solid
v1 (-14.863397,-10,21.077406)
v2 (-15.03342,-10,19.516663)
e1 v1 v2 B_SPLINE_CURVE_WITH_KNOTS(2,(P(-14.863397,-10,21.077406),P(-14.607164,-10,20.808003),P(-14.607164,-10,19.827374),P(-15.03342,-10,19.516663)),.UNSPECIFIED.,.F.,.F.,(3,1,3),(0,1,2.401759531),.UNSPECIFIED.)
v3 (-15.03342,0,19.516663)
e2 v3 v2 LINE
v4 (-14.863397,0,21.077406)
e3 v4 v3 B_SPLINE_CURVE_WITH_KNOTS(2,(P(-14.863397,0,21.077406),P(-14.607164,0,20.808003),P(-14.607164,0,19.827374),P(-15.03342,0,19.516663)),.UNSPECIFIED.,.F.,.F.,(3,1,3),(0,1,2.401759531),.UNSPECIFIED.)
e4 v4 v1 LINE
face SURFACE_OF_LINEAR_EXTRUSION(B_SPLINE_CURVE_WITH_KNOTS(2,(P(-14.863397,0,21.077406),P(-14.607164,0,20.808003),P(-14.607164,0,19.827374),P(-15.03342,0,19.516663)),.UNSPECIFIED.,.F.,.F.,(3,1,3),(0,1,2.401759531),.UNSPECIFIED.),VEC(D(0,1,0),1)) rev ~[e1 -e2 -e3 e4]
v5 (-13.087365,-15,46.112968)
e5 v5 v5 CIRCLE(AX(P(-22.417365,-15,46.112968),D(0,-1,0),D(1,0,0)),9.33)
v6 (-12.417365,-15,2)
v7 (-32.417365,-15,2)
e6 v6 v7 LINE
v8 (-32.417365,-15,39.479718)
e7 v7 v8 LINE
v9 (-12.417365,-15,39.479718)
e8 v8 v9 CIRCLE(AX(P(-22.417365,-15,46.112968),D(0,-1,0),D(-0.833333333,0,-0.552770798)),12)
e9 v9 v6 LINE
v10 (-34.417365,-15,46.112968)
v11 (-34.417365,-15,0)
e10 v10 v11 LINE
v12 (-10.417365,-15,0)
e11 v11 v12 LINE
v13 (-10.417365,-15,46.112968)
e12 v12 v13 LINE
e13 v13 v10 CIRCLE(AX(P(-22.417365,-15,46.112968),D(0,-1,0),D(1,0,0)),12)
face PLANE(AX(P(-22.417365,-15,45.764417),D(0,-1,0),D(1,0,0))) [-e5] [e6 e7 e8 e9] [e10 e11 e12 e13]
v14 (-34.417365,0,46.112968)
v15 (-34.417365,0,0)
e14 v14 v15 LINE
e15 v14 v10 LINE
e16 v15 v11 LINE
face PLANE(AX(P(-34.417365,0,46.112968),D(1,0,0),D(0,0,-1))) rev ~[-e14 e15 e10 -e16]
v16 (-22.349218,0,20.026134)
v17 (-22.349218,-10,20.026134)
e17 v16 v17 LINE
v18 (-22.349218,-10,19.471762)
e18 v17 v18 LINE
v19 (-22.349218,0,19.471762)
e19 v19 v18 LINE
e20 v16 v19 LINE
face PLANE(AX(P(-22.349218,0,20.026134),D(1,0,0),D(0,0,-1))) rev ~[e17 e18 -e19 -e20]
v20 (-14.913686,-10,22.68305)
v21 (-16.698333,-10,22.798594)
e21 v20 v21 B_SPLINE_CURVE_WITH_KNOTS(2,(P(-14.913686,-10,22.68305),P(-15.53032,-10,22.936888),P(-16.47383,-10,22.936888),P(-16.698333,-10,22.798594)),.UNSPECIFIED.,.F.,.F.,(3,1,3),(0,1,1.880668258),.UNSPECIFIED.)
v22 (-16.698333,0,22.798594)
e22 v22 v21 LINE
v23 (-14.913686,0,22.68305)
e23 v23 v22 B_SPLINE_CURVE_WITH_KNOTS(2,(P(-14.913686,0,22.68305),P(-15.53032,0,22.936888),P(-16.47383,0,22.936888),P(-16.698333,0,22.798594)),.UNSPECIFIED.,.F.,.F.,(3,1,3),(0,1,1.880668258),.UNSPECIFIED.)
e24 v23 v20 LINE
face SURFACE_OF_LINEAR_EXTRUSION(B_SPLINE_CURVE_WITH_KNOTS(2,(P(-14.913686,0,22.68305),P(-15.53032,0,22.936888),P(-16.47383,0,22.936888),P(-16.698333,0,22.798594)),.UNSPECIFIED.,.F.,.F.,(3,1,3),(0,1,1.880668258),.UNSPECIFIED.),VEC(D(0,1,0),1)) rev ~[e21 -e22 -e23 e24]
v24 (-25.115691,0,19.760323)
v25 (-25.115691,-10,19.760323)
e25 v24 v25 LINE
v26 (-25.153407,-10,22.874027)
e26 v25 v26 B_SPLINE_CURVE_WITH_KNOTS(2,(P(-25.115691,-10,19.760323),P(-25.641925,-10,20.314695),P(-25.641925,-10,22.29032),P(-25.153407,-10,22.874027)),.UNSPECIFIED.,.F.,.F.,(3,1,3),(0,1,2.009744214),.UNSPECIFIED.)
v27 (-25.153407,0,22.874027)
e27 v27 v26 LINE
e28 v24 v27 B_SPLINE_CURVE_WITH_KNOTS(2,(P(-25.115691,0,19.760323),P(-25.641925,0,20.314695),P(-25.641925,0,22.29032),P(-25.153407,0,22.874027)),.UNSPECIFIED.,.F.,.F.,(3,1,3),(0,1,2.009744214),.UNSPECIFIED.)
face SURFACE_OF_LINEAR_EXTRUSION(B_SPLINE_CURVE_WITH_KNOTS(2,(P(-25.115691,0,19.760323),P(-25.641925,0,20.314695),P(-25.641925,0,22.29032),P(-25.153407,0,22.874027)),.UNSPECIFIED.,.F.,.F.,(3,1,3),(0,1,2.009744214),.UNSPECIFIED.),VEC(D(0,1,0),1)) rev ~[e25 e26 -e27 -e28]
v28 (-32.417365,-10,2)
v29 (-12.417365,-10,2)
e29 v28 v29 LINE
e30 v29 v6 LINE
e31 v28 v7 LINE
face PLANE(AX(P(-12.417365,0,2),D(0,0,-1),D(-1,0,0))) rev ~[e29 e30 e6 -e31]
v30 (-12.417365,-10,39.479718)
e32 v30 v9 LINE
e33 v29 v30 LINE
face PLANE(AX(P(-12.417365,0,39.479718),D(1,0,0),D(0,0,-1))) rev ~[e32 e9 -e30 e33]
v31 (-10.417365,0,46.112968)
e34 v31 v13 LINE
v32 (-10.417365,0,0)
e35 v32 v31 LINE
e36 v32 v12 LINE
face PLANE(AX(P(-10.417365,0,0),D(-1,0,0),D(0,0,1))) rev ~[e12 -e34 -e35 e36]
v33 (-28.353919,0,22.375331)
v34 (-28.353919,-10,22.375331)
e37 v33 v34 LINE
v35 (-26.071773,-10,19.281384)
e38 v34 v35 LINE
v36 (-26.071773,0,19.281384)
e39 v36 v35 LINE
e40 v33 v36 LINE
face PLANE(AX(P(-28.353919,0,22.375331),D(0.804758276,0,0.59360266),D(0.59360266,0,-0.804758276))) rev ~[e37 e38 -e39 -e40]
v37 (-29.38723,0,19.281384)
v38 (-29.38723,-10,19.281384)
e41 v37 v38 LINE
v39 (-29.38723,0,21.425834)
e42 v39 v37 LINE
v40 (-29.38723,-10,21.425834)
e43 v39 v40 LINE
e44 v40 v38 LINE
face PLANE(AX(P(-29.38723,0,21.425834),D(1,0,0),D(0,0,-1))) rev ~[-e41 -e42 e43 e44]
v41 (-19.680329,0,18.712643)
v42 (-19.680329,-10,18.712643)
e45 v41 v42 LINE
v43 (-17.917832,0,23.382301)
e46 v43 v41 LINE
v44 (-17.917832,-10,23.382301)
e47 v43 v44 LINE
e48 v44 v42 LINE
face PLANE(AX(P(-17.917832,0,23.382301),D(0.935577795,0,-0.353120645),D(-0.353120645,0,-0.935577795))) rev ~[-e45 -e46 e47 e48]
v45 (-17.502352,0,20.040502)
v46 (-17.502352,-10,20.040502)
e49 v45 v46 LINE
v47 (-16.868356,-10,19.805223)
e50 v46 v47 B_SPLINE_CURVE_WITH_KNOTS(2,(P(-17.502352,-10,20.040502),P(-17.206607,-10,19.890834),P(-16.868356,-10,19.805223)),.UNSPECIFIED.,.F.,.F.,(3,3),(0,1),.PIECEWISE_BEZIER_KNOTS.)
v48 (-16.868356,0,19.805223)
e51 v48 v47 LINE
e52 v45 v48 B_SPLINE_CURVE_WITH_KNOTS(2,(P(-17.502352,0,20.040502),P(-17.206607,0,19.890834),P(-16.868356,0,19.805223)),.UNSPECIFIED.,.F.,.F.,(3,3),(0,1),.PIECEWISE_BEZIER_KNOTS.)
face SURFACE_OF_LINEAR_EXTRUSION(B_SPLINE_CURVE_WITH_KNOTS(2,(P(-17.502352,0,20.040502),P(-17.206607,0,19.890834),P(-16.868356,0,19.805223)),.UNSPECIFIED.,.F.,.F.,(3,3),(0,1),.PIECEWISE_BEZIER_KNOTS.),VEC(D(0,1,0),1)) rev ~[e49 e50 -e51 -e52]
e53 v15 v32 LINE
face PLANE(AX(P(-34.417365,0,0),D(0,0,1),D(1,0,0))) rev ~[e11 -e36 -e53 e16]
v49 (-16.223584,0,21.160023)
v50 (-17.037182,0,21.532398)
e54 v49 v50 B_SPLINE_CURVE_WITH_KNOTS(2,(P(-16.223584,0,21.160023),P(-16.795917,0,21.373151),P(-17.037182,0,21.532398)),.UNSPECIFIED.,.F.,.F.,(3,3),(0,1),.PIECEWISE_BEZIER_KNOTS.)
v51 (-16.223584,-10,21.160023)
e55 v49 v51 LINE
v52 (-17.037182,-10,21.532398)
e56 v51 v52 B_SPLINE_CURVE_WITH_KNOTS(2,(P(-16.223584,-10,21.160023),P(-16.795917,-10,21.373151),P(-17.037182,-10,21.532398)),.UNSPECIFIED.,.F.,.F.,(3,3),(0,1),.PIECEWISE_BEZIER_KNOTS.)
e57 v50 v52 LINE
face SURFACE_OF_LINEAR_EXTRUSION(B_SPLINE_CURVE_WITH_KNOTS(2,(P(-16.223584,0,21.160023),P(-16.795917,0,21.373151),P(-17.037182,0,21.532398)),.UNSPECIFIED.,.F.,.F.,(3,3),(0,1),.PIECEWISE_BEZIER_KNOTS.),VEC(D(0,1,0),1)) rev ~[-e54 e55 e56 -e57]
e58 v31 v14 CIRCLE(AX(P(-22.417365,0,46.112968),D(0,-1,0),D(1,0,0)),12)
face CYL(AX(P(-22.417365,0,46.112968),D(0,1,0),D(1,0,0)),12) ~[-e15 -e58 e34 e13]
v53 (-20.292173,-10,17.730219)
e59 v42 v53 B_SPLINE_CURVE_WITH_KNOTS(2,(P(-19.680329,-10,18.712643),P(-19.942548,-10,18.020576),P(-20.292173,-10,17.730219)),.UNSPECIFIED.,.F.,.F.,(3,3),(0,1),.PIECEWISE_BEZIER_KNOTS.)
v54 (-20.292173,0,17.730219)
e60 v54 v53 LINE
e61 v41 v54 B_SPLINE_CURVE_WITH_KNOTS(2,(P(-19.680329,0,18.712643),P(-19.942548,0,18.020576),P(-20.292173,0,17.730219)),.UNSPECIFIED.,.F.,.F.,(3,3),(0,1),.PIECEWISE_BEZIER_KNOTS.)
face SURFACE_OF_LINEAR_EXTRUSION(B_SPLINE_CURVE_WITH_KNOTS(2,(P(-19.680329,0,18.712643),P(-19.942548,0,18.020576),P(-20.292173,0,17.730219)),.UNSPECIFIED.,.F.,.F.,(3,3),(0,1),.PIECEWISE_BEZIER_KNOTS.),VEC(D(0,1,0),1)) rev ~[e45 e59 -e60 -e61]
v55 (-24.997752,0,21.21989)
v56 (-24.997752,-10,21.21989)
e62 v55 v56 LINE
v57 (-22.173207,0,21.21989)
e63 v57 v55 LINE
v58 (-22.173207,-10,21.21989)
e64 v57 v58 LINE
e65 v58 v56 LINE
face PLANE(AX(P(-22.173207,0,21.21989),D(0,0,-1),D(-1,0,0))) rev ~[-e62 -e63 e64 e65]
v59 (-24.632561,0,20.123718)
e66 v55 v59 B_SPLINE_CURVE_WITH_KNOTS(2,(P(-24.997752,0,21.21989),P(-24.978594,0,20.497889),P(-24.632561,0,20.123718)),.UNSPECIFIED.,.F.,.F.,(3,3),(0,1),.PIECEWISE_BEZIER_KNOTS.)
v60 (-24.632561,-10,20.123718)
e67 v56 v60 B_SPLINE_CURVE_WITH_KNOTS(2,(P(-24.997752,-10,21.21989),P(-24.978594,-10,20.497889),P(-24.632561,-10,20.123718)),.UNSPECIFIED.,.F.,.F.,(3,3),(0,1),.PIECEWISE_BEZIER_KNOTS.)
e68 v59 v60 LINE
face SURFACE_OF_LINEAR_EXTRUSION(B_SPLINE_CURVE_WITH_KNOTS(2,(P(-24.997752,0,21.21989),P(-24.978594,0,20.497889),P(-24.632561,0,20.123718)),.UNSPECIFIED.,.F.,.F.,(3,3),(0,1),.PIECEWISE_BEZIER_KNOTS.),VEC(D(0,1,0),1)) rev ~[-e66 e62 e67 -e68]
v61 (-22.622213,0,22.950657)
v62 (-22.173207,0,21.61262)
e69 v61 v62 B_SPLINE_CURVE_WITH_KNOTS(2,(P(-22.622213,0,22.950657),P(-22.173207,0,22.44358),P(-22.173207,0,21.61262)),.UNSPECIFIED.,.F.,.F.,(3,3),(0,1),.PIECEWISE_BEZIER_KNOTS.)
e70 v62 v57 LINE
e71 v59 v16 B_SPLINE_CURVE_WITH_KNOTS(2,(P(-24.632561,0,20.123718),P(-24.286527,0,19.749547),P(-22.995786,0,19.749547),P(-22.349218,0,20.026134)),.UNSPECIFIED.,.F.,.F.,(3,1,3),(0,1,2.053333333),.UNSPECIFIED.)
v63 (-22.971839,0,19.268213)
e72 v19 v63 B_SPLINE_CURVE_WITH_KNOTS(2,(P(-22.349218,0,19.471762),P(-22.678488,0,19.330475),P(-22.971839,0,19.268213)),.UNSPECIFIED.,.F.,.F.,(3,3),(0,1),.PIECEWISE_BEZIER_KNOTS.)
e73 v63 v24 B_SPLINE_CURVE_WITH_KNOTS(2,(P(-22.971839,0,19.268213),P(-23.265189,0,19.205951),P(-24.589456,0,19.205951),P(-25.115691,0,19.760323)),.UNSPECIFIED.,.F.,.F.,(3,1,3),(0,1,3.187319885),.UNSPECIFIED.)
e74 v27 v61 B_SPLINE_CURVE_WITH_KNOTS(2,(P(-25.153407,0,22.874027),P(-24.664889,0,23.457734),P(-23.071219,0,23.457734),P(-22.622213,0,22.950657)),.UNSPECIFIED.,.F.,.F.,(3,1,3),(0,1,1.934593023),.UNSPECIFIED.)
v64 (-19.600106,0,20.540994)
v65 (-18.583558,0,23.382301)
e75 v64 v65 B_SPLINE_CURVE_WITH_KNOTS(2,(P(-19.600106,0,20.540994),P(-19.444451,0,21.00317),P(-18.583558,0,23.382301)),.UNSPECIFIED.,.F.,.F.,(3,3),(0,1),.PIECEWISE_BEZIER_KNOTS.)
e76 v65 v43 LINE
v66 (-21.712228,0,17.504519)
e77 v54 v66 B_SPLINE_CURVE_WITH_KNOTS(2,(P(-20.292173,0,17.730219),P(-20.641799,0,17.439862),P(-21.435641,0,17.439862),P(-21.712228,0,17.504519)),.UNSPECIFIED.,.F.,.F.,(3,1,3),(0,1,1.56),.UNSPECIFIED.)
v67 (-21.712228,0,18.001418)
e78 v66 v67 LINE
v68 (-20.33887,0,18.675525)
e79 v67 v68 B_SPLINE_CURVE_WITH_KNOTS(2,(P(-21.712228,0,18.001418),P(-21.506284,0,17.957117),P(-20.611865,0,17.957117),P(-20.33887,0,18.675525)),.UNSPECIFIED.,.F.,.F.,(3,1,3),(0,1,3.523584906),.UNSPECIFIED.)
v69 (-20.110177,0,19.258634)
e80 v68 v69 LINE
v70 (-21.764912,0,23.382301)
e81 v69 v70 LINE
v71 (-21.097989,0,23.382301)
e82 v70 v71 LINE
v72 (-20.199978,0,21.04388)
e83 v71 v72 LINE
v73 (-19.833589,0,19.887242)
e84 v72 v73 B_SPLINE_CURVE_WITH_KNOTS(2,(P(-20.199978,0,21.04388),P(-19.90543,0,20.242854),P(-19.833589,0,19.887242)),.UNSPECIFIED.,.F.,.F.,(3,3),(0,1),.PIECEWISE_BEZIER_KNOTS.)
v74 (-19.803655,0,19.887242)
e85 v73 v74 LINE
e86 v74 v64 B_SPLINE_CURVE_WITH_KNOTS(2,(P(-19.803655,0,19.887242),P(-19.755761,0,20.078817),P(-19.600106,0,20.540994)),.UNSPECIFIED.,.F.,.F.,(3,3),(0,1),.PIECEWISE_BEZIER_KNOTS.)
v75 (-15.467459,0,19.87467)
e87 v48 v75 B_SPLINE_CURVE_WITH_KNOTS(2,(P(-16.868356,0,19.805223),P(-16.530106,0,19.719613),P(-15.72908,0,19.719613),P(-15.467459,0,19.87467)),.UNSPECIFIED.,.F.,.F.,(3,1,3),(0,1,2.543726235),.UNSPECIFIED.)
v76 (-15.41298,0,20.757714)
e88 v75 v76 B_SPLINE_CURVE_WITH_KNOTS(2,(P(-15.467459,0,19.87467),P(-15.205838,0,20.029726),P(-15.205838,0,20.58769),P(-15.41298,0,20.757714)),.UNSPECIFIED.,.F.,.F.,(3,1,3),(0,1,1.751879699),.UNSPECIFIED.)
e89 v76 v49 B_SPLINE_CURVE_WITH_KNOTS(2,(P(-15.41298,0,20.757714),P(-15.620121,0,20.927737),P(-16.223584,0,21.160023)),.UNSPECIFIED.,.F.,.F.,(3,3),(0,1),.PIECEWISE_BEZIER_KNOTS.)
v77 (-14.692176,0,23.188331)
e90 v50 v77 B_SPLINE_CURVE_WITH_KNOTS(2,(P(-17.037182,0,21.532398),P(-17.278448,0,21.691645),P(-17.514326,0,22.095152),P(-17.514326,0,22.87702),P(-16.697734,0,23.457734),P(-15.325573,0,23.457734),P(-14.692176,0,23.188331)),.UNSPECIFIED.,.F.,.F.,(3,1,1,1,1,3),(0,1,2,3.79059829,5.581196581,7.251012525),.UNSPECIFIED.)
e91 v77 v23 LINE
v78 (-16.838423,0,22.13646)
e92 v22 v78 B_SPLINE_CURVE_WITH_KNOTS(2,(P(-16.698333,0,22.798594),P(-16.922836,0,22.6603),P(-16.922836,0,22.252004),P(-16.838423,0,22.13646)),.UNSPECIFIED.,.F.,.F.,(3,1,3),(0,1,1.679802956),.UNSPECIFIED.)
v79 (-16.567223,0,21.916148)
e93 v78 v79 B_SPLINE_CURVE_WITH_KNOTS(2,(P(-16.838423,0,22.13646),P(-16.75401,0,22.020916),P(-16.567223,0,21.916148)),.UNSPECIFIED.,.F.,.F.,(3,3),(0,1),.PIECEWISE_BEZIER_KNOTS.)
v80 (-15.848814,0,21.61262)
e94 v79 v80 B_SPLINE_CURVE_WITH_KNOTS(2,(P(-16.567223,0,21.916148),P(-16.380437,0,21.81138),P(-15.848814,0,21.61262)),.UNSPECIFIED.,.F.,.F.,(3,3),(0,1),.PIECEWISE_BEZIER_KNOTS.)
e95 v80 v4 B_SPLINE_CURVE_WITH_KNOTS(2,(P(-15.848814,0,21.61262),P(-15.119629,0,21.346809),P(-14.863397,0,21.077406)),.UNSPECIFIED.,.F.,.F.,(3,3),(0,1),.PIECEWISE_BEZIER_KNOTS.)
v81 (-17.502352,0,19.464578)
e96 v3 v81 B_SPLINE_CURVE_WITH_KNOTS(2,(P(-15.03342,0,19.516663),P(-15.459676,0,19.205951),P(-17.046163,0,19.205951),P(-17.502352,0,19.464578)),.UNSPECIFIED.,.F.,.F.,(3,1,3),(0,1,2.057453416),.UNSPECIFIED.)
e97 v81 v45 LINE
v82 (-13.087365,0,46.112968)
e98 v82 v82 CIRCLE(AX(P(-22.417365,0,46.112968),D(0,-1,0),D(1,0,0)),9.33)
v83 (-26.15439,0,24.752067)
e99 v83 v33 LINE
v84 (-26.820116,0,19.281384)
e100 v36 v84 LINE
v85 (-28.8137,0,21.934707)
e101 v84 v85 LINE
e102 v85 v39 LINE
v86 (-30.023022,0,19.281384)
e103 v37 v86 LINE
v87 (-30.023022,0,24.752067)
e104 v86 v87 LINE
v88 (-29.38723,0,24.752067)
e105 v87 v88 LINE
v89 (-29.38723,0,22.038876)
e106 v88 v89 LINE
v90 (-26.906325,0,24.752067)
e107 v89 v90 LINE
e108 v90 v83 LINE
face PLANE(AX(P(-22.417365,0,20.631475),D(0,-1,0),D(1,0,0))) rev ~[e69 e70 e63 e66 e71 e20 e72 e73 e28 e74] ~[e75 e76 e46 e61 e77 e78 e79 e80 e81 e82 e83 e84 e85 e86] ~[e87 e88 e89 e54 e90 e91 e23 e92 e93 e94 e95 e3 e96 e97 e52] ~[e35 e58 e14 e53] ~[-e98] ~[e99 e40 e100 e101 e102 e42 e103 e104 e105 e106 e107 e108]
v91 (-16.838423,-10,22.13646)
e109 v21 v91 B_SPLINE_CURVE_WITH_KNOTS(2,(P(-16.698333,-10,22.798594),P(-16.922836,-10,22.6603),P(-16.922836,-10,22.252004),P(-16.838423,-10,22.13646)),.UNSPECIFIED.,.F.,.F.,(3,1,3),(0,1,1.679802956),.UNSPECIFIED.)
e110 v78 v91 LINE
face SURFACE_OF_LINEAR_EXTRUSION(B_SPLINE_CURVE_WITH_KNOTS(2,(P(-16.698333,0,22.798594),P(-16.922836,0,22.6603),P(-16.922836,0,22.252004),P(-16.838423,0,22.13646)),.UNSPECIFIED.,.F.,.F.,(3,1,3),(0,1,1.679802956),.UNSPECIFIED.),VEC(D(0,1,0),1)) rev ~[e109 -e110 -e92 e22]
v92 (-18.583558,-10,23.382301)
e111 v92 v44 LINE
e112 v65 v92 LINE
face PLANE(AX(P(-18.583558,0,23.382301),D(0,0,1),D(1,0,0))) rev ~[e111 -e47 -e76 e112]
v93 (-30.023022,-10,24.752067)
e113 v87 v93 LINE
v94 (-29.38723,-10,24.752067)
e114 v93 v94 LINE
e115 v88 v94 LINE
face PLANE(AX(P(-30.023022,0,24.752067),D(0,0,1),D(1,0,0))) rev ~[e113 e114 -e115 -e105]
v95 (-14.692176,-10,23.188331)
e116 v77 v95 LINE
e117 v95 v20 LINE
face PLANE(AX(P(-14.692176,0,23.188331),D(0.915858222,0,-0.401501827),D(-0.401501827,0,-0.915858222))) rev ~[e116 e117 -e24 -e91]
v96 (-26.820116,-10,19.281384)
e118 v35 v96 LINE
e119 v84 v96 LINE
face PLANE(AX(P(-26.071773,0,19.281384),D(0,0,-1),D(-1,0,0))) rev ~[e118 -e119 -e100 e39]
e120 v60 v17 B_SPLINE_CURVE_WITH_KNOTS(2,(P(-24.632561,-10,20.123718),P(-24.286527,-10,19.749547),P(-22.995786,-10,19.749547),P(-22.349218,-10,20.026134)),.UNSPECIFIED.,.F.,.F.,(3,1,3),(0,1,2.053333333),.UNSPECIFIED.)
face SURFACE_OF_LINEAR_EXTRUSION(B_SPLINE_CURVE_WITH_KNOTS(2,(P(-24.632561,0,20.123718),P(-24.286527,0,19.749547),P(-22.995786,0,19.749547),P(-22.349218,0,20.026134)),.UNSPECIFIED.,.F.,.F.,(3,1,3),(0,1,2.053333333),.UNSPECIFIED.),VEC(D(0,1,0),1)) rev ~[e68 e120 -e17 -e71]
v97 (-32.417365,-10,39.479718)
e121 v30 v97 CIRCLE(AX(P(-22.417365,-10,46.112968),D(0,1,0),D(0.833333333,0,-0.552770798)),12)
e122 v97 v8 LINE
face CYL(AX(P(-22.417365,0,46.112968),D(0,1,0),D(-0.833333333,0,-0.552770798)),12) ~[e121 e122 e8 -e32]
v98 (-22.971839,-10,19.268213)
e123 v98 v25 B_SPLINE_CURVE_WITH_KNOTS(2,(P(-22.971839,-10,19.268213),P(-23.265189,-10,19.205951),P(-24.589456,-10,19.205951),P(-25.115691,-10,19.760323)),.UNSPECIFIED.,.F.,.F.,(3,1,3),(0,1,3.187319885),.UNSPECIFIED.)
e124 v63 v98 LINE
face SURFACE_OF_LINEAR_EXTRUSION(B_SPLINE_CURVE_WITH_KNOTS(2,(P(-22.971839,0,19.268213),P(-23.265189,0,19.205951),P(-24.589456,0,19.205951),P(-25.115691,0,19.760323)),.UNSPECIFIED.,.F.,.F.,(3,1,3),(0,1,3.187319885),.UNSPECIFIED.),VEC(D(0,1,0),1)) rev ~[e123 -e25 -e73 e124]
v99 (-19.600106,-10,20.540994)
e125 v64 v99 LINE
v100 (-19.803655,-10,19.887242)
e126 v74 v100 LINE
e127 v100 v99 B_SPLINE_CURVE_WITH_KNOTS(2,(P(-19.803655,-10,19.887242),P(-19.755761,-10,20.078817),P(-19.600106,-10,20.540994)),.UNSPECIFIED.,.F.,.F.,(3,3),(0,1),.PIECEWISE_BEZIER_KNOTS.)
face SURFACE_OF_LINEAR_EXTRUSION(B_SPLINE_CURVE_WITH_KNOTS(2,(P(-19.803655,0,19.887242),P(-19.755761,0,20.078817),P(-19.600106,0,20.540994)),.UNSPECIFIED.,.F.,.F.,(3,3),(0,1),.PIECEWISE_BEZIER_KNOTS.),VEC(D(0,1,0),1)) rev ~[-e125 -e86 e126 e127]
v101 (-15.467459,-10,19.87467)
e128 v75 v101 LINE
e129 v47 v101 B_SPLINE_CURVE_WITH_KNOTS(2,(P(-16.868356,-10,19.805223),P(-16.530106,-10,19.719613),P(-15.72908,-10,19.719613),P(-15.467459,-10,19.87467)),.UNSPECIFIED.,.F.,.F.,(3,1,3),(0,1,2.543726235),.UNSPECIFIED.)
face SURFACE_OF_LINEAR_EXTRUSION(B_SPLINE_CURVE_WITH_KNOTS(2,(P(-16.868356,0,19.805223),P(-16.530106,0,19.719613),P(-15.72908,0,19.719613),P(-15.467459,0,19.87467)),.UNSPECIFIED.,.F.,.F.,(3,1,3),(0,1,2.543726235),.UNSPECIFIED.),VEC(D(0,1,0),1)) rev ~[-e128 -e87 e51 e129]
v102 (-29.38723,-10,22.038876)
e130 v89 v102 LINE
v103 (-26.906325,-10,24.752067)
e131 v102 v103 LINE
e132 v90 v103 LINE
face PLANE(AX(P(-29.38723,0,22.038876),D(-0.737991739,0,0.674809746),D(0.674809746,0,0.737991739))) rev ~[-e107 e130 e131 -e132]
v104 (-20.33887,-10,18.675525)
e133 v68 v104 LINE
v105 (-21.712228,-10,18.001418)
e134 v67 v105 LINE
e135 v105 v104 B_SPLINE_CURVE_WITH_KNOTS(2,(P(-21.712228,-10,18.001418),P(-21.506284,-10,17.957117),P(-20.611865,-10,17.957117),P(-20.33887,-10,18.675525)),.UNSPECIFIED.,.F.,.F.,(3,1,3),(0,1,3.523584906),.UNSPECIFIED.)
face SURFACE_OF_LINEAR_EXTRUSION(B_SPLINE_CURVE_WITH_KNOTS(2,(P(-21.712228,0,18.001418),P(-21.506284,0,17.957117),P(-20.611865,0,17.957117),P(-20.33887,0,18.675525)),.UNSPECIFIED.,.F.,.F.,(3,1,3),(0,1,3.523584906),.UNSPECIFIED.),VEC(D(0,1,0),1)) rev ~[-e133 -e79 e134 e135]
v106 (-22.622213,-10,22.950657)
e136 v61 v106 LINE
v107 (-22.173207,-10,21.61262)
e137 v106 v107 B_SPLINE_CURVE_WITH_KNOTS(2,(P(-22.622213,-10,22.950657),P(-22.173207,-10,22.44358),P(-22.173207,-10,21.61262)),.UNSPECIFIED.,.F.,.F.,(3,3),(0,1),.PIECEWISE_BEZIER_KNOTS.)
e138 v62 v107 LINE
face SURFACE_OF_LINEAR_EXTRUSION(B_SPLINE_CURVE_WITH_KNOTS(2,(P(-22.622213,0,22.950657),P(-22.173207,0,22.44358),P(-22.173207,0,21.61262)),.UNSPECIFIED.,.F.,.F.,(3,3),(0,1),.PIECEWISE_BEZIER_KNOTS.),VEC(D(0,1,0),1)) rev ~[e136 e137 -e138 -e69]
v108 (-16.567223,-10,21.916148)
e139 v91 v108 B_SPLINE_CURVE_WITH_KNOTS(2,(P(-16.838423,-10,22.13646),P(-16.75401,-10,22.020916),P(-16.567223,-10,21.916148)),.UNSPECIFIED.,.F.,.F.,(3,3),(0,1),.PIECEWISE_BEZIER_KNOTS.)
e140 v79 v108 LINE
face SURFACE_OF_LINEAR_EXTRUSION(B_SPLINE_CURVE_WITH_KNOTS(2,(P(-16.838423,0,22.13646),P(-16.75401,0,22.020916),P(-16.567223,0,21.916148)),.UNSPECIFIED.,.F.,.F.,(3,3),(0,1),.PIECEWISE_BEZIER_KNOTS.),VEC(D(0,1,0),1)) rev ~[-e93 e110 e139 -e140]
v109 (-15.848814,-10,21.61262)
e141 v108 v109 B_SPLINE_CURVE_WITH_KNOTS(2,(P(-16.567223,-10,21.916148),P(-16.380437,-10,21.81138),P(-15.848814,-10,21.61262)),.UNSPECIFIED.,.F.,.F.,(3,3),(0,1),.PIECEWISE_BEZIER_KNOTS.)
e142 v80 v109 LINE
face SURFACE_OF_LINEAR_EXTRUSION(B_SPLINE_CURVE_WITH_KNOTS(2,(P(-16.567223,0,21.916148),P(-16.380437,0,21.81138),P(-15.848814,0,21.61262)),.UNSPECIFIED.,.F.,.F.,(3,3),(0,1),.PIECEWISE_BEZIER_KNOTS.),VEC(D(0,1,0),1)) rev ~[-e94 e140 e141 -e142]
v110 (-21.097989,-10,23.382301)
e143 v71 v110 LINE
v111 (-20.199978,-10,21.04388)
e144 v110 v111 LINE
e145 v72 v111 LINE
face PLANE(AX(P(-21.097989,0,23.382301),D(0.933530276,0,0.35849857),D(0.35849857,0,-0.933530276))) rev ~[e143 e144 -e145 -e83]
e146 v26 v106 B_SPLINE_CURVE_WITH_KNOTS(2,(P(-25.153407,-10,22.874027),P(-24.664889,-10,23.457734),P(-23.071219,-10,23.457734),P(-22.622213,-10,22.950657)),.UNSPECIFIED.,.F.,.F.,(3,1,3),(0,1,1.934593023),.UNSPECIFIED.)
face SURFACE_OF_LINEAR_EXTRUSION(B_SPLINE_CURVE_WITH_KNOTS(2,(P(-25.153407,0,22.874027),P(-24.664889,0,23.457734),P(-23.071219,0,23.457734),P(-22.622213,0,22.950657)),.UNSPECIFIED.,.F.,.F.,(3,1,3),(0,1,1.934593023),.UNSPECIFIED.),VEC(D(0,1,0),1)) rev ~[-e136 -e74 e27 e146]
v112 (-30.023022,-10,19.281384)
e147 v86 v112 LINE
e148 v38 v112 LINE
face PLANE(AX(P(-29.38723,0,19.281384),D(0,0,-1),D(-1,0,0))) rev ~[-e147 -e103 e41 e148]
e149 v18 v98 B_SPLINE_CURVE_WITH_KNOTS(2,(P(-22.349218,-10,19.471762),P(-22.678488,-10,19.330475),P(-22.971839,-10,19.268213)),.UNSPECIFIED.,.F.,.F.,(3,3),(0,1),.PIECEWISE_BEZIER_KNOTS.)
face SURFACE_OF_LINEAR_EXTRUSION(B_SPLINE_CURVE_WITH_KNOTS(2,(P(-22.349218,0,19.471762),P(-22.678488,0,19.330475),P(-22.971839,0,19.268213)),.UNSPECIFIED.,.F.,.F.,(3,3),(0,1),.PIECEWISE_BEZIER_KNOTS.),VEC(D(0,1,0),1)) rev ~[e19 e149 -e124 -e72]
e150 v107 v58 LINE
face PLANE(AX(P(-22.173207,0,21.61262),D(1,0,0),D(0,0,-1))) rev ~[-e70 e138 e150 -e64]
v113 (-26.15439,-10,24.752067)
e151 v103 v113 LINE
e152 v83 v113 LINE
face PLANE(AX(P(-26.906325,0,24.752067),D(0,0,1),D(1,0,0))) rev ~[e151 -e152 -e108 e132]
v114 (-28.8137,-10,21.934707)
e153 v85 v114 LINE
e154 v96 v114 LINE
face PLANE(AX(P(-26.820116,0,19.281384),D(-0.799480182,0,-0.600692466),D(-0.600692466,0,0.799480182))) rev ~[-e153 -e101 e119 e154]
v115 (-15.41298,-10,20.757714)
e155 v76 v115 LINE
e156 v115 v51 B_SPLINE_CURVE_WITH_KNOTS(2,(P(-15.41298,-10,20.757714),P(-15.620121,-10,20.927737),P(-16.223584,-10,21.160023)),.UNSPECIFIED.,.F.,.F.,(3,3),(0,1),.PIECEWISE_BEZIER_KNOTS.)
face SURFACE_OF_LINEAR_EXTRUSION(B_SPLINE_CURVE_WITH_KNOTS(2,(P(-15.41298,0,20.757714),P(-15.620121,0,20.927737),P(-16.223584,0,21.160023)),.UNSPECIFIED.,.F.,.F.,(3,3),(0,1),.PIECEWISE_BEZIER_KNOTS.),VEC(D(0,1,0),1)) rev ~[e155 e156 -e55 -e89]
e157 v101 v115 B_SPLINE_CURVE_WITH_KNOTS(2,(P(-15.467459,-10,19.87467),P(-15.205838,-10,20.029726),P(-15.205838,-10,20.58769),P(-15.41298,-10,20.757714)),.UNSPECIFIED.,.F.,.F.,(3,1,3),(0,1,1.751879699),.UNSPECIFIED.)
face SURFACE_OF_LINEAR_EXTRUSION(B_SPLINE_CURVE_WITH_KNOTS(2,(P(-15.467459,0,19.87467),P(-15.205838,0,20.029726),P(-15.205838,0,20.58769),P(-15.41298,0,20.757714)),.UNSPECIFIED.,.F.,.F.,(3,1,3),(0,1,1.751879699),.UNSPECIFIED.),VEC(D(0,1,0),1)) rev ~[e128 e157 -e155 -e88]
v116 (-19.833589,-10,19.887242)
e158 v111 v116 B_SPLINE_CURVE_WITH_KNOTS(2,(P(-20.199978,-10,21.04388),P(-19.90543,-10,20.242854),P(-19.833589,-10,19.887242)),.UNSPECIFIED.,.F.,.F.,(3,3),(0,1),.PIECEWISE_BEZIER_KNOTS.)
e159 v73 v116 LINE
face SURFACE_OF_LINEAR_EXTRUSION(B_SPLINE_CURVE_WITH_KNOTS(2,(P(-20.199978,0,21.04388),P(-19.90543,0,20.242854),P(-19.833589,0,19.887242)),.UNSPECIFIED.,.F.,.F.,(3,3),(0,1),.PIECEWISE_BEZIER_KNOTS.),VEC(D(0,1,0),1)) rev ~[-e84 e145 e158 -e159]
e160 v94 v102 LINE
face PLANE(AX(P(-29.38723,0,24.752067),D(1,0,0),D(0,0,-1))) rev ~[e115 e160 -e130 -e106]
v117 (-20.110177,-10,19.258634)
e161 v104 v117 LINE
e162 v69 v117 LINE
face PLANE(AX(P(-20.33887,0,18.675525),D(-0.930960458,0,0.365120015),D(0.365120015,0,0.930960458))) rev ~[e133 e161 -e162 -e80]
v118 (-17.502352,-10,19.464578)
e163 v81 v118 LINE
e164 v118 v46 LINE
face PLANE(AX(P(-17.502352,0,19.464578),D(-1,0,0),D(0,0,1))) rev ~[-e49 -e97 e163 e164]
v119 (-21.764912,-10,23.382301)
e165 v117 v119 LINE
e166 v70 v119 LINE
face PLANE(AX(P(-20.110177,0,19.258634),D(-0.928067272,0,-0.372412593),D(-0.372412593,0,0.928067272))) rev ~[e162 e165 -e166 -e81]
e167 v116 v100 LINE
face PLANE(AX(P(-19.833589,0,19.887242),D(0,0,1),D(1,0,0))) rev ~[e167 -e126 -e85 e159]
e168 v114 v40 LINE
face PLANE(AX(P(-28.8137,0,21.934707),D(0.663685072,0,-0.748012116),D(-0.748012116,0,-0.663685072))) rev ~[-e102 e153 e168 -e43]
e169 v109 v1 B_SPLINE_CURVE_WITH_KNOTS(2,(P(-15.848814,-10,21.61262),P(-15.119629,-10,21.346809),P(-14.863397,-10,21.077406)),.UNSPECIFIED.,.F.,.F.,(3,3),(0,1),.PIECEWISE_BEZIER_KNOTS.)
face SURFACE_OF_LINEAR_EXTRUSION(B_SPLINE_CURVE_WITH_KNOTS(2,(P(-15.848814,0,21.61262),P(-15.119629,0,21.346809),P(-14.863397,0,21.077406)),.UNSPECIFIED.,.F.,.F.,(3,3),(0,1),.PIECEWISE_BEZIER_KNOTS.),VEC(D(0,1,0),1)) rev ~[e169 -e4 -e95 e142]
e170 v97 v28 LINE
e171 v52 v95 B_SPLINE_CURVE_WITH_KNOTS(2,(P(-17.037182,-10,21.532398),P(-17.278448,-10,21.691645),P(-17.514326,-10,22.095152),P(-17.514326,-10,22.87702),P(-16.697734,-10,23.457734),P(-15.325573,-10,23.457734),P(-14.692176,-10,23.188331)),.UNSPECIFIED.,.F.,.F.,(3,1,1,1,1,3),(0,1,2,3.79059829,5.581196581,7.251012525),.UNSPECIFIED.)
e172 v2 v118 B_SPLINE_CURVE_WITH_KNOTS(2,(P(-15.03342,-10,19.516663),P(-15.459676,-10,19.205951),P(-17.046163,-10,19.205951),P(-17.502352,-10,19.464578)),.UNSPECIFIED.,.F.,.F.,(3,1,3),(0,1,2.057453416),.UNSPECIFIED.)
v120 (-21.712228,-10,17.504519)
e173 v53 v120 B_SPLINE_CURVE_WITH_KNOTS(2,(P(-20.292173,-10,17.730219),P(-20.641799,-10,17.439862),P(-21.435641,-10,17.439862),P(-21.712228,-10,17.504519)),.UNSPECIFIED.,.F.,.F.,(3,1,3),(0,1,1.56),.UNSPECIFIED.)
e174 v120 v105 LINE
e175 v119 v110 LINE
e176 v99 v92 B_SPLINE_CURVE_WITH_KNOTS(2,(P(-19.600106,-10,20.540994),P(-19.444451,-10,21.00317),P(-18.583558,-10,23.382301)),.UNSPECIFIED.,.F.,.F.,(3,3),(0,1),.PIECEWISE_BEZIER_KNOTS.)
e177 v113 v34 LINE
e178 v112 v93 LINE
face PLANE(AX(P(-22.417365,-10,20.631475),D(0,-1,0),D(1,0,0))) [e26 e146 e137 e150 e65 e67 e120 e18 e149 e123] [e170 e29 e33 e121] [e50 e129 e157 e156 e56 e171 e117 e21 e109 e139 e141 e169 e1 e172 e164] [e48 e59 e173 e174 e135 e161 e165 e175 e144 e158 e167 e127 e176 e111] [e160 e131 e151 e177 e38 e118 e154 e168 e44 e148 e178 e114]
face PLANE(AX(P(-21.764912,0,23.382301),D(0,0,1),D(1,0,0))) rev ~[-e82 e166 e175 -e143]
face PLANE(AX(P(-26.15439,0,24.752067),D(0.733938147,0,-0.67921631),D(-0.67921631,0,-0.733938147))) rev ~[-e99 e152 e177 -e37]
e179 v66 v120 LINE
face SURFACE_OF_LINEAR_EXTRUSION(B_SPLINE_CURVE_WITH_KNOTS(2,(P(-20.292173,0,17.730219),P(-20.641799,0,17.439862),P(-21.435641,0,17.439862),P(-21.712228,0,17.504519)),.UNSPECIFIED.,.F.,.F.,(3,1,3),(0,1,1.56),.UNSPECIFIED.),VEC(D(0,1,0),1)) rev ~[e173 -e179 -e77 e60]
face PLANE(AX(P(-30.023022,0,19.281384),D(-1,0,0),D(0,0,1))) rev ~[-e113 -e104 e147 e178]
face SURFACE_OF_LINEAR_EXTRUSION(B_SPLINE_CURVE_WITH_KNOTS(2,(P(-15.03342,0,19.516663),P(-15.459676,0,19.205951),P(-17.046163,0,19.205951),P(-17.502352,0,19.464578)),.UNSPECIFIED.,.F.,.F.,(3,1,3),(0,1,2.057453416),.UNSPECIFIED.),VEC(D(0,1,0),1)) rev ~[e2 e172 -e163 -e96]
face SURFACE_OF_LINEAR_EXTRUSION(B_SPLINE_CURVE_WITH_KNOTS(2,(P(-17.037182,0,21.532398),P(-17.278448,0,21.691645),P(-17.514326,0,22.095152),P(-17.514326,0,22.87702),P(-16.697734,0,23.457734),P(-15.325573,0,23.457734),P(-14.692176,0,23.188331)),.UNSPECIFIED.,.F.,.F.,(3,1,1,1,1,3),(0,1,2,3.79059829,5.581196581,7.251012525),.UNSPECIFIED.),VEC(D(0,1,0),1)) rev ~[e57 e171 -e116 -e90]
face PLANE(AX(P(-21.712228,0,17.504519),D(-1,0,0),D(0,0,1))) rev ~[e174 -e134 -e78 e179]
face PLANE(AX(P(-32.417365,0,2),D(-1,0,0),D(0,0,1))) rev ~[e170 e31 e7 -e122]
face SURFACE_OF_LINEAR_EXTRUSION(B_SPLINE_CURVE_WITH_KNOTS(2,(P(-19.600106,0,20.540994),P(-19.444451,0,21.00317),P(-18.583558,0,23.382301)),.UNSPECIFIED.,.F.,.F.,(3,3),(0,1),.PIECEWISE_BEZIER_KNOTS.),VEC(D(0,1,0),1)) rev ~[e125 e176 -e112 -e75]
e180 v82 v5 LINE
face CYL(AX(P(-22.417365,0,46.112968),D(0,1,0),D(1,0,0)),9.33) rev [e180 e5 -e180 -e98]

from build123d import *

# Parameters (mm, degrees)
F0_R     = 9.33
F1_DEPTH = 15
F2_DEPTH = 10


with BuildPart() as f1:
    # F0 (on Front) → F1 (new body)
    with BuildSketch(Plane.XZ):
        with BuildLine():
            ThreePointArc((-12.417365469, 39.4797180027), (-10.928240176, 42.6488659683), (-10.417365469, 46.1129675834))
            ThreePointArc((-10.417365469, 46.1129675834), (-22.417365469, 58.1129675834), (-34.417365469, 46.1129675834))
            ThreePointArc((-34.417365469, 46.1129675834), (-33.9064907621, 42.6488659683), (-32.417365469, 39.4797180027))
            ThreePointArc((-32.417365469, 39.4797180027), (-22.417365469, 34.1129675834), (-12.417365469, 39.4797180027))
        make_face()
        with Locations((-22.417365469, 46.1129675834)):
            Circle(F0_R, mode=Mode.SUBTRACT)
        with BuildLine():
            Line((-10.417365469, 0), (-10.417365469, 46.1129675834))
            ThreePointArc((-10.417365469, 46.1129675834), (-10.928240176, 42.6488659683), (-12.417365469, 39.4797180027))
            Line((-12.417365469, 39.4797180027), (-12.417365469, 2))
            Line((-12.417365469, 2), (-32.417365469, 2))
            Line((-32.417365469, 2), (-32.417365469, 39.4797180027))
            ThreePointArc((-32.417365469, 39.4797180027), (-33.9064907621, 42.6488659683), (-34.417365469, 46.1129675834))
            Line((-34.417365469, 46.1129675834), (-34.417365469, 0))
            Line((-34.417365469, 0), (-10.417365469, 0))
        make_face()
    extrude(amount=F1_DEPTH)

    # F0 (on Front) → F2 (join)
    with BuildSketch(Plane.XZ):
        with BuildLine():
            Line((-12.417365469, 2), (-12.417365469, 39.4797180027))
            ThreePointArc((-12.417365469, 39.4797180027), (-22.417365469, 34.1129675834), (-32.417365469, 39.4797180027))
            Line((-32.417365469, 39.4797180027), (-32.417365469, 2))
            Line((-32.417365469, 2), (-12.417365469, 2))
        make_face()
        with BuildLine():
            add(Edge.make_bspline(
                [(-22.9718386234, 19.2682127741), (-23.2651889221, 19.2059506699), (-23.6806687329, 19.2059506699)],
                knots=[0, 0, 0, 1, 1, 1], degree=2))
            add(Edge.make_bspline(
                [(-23.6806687329, 19.2059506699), (-24.5894559848, 19.2059506699), (-25.1156905003, 19.760322867)],
                knots=[0, 0, 0, 1, 1, 1], degree=2))
            add(Edge.make_bspline(
                [(-25.1156905003, 19.760322867), (-25.6419250157, 20.3146950642), (-25.6419250157, 21.2977179019)],
                knots=[0, 0, 0, 1, 1, 1], degree=2))
            add(Edge.make_bspline(
                [(-25.6419250157, 21.2977179019), (-25.6419250157, 22.2903195249), (-25.1534069672, 22.8740267519)],
                knots=[0, 0, 0, 1, 1, 1], degree=2))
            add(Edge.make_bspline(
                [(-25.1534069672, 22.8740267519), (-24.6648889188, 23.4577339789), (-23.8411133861, 23.4577339789)],
                knots=[0, 0, 0, 1, 1, 1], degree=2))
            add(Edge.make_bspline(
                [(-23.8411133861, 23.4577339789), (-23.0712185205, 23.4577339789), (-22.6222129612, 22.950657034)],
                knots=[0, 0, 0, 1, 1, 1], degree=2))
            add(Edge.make_bspline(
                [(-22.6222129612, 22.950657034), (-22.173207402, 22.4435800891), (-22.173207402, 21.6126204674)],
                knots=[0, 0, 0, 1, 1, 1], degree=2))
            Line((-22.173207402, 21.6126204674), (-22.173207402, 21.2198902716))
            Line((-22.173207402, 21.2198902716), (-24.9977517067, 21.2198902716))
            add(Edge.make_bspline(
                [(-24.9977517067, 21.2198902716), (-24.9785941362, 20.4978893323), (-24.6325605185, 20.123718033)],
                knots=[0, 0, 0, 1, 1, 1], degree=2))
            add(Edge.make_bspline(
                [(-24.6325605185, 20.123718033), (-24.2865269008, 19.7495467336), (-23.6579191179, 19.7495467336)],
                knots=[0, 0, 0, 1, 1, 1], degree=2))
            add(Edge.make_bspline(
                [(-23.6579191179, 19.7495467336), (-22.9957855865, 19.7495467336), (-22.3492175812, 20.0261341581)],
                knots=[0, 0, 0, 1, 1, 1], degree=2))
            Line((-22.3492175812, 20.0261341581), (-22.3492175812, 19.4717619609))
            add(Edge.make_bspline(
                [(-22.3492175812, 19.4717619609), (-22.6784883246, 19.3304748783), (-22.9718386234, 19.2682127741)],
                knots=[0, 0, 0, 1, 1, 1], degree=2))
        make_face(mode=Mode.SUBTRACT)
        Polygon((-28.3539185936, 22.3753312441), (-26.0717730044, 19.2813836038), (-26.8201156032, 19.2813836038), (-28.8137002863, 21.9347071219), (-29.3872300539, 21.4258341548), (-29.3872300539, 19.2813836038), (-30.0230219258, 19.2813836038), (-30.0230219258, 24.7520673377), (-29.3872300539, 24.7520673377), (-29.3872300539, 22.0388764117), (-26.9063246706, 24.7520673377), (-26.1543900273, 24.7520673377), align=None, mode=Mode.SUBTRACT)
        with BuildLine():
            Line((-20.1101765257, 19.2586339888), (-21.7649116801, 23.382301045))
            Line((-21.7649116801, 23.382301045), (-21.0979887561, 23.382301045))
            Line((-21.0979887561, 23.382301045), (-20.1999776376, 21.0438800924))
            add(Edge.make_bspline(
                [(-20.1999776376, 21.0438800924), (-19.9054299907, 20.2428541747), (-19.8335891012, 19.8872417718)],
                knots=[0, 0, 0, 1, 1, 1], degree=2))
            Line((-19.8335891012, 19.8872417718), (-19.8036553973, 19.8872417718))
            add(Edge.make_bspline(
                [(-19.8036553973, 19.8872417718), (-19.755761471, 20.078817477), (-19.6001062104, 20.540993866)],
                knots=[0, 0, 0, 1, 1, 1], degree=2))
            add(Edge.make_bspline(
                [(-19.6001062104, 20.540993866), (-19.4444509499, 21.003170255), (-18.5835576243, 23.382301045)],
                knots=[0, 0, 0, 1, 1, 1], degree=2))
            Line((-18.5835576243, 23.382301045), (-17.9178320484, 23.382301045))
            Line((-17.9178320484, 23.382301045), (-19.680328537, 18.7126432288))
            add(Edge.make_bspline(
                [(-19.680328537, 18.7126432288), (-19.9425477836, 18.0205759934), (-20.2921734457, 17.7302190651)],
                knots=[0, 0, 0, 1, 1, 1], degree=2))
            add(Edge.make_bspline(
                [(-20.2921734457, 17.7302190651), (-20.6417991079, 17.4398621368), (-21.150672075, 17.4398621368)],
                knots=[0, 0, 0, 1, 1, 1], degree=2))
            add(Edge.make_bspline(
                [(-21.150672075, 17.4398621368), (-21.4356409366, 17.4398621368), (-21.7122283611, 17.5045189373)],
                knots=[0, 0, 0, 1, 1, 1], degree=2))
            Line((-21.7122283611, 17.5045189373), (-21.7122283611, 18.0014184229))
            add(Edge.make_bspline(
                [(-21.7122283611, 18.0014184229), (-21.506284478, 17.9571165411), (-21.2524466685, 17.9571165411)],
                knots=[0, 0, 0, 1, 1, 1], degree=2))
            add(Edge.make_bspline(
                [(-21.2524466685, 17.9571165411), (-20.6118654039, 17.9571165411), (-20.3388700239, 18.6755254359)],
                knots=[0, 0, 0, 1, 1, 1], degree=2))
            Line((-20.3388700239, 18.6755254359), (-20.1101765257, 19.2586339888))
        make_face(mode=Mode.SUBTRACT)
        with BuildLine():
            add(Edge.make_bspline(
                [(-14.8633968974, 21.0774058408), (-14.6071643915, 20.8080025053), (-14.6071643915, 20.3997067834)],
                knots=[0, 0, 0, 1, 1, 1], degree=2))
            add(Edge.make_bspline(
                [(-14.6071643915, 20.3997067834), (-14.6071643915, 19.8273743639), (-15.0334203358, 19.5166625169)],
                knots=[0, 0, 0, 1, 1, 1], degree=2))
            add(Edge.make_bspline(
                [(-15.0334203358, 19.5166625169), (-15.45967628, 19.2059506699), (-16.2307684938, 19.2059506699)],
                knots=[0, 0, 0, 1, 1, 1], degree=2))
            add(Edge.make_bspline(
                [(-16.2307684938, 19.2059506699), (-17.0461625894, 19.2059506699), (-17.5023522376, 19.464577872)],
                knots=[0, 0, 0, 1, 1, 1], degree=2))
            Line((-17.5023522376, 19.464577872), (-17.5023522376, 20.040502336))
            add(Edge.make_bspline(
                [(-17.5023522376, 20.040502336), (-17.2066072426, 19.8908338162), (-16.8683563879, 19.8052234229)],
                knots=[0, 0, 0, 1, 1, 1], degree=2))
            add(Edge.make_bspline(
                [(-16.8683563879, 19.8052234229), (-16.5301055333, 19.7196130296), (-16.2152029677, 19.7196130296)],
                knots=[0, 0, 0, 1, 1, 1], degree=2))
            add(Edge.make_bspline(
                [(-16.2152029677, 19.7196130296), (-15.7290796156, 19.7196130296), (-15.4674590431, 19.8746696161)],
                knots=[0, 0, 0, 1, 1, 1], degree=2))
            add(Edge.make_bspline(
                [(-15.4674590431, 19.8746696161), (-15.2058384705, 20.0297262026), (-15.2058384705, 20.3482208126)],
                knots=[0, 0, 0, 1, 1, 1], degree=2))
            add(Edge.make_bspline(
                [(-15.2058384705, 20.3482208126), (-15.2058384705, 20.5876904442), (-15.4129797019, 20.7577138826)],
                knots=[0, 0, 0, 1, 1, 1], degree=2))
            add(Edge.make_bspline(
                [(-15.4129797019, 20.7577138826), (-15.6201209332, 20.9277373211), (-16.2235844048, 21.1600228637)],
                knots=[0, 0, 0, 1, 1, 1], degree=2))
            add(Edge.make_bspline(
                [(-16.2235844048, 21.1600228637), (-16.7959168244, 21.3731508358), (-17.0371824782, 21.5323981409)],
                knots=[0, 0, 0, 1, 1, 1], degree=2))
            add(Edge.make_bspline(
                [(-17.0371824782, 21.5323981409), (-17.278448132, 21.6916454459), (-17.3963869256, 21.8933986105)],
                knots=[0, 0, 0, 1, 1, 1], degree=2))
            add(Edge.make_bspline(
                [(-17.3963869256, 21.8933986105), (-17.5143257192, 22.0951517751), (-17.5143257192, 22.3753312441)],
                knots=[0, 0, 0, 1, 1, 1], degree=2))
            add(Edge.make_bspline(
                [(-17.5143257192, 22.3753312441), (-17.5143257192, 22.8770201223), (-17.1060299973, 23.1673770506)],
                knots=[0, 0, 0, 1, 1, 1], degree=2))
            add(Edge.make_bspline(
                [(-17.1060299973, 23.1673770506), (-16.6977342754, 23.4577339789), (-15.9877068177, 23.4577339789)],
                knots=[0, 0, 0, 1, 1, 1], degree=2))
            add(Edge.make_bspline(
                [(-15.9877068177, 23.4577339789), (-15.3255732863, 23.4577339789), (-14.6921761108, 23.1883306434)],
                knots=[0, 0, 0, 1, 1, 1], degree=2))
            Line((-14.6921761108, 23.1883306434), (-14.91368552, 22.6830497207))
            add(Edge.make_bspline(
                [(-14.91368552, 22.6830497207), (-15.5303198214, 22.9368875302), (-16.0320086996, 22.9368875302)],
                knots=[0, 0, 0, 1, 1, 1], degree=2))
            add(Edge.make_bspline(
                [(-16.0320086996, 22.9368875302), (-16.4738301699, 22.9368875302), (-16.6983329495, 22.7985938179)],
                knots=[0, 0, 0, 1, 1, 1], degree=2))
            add(Edge.make_bspline(
                [(-16.6983329495, 22.7985938179), (-16.9228357291, 22.6603001057), (-16.9228357291, 22.4172384296)],
                knots=[0, 0, 0, 1, 1, 1], degree=2))
            add(Edge.make_bspline(
                [(-16.9228357291, 22.4172384296), (-16.9228357291, 22.2520043838), (-16.838422684, 22.1364602866)],
                knots=[0, 0, 0, 1, 1, 1], degree=2))
            add(Edge.make_bspline(
                [(-16.838422684, 22.1364602866), (-16.7540096388, 22.0209161893), (-16.5672233262, 21.9161482255)],
                knots=[0, 0, 0, 1, 1, 1], degree=2))
            add(Edge.make_bspline(
                [(-16.5672233262, 21.9161482255), (-16.3804370135, 21.8113802617), (-15.8488144314, 21.6126204674)],
                knots=[0, 0, 0, 1, 1, 1], degree=2))
            add(Edge.make_bspline(
                [(-15.8488144314, 21.6126204674), (-15.1196294032, 21.3468091764), (-14.8633968974, 21.0774058408)],
                knots=[0, 0, 0, 1, 1, 1], degree=2))
        make_face(mode=Mode.SUBTRACT)
    extrude(amount=F2_DEPTH)


solid = f1.part
